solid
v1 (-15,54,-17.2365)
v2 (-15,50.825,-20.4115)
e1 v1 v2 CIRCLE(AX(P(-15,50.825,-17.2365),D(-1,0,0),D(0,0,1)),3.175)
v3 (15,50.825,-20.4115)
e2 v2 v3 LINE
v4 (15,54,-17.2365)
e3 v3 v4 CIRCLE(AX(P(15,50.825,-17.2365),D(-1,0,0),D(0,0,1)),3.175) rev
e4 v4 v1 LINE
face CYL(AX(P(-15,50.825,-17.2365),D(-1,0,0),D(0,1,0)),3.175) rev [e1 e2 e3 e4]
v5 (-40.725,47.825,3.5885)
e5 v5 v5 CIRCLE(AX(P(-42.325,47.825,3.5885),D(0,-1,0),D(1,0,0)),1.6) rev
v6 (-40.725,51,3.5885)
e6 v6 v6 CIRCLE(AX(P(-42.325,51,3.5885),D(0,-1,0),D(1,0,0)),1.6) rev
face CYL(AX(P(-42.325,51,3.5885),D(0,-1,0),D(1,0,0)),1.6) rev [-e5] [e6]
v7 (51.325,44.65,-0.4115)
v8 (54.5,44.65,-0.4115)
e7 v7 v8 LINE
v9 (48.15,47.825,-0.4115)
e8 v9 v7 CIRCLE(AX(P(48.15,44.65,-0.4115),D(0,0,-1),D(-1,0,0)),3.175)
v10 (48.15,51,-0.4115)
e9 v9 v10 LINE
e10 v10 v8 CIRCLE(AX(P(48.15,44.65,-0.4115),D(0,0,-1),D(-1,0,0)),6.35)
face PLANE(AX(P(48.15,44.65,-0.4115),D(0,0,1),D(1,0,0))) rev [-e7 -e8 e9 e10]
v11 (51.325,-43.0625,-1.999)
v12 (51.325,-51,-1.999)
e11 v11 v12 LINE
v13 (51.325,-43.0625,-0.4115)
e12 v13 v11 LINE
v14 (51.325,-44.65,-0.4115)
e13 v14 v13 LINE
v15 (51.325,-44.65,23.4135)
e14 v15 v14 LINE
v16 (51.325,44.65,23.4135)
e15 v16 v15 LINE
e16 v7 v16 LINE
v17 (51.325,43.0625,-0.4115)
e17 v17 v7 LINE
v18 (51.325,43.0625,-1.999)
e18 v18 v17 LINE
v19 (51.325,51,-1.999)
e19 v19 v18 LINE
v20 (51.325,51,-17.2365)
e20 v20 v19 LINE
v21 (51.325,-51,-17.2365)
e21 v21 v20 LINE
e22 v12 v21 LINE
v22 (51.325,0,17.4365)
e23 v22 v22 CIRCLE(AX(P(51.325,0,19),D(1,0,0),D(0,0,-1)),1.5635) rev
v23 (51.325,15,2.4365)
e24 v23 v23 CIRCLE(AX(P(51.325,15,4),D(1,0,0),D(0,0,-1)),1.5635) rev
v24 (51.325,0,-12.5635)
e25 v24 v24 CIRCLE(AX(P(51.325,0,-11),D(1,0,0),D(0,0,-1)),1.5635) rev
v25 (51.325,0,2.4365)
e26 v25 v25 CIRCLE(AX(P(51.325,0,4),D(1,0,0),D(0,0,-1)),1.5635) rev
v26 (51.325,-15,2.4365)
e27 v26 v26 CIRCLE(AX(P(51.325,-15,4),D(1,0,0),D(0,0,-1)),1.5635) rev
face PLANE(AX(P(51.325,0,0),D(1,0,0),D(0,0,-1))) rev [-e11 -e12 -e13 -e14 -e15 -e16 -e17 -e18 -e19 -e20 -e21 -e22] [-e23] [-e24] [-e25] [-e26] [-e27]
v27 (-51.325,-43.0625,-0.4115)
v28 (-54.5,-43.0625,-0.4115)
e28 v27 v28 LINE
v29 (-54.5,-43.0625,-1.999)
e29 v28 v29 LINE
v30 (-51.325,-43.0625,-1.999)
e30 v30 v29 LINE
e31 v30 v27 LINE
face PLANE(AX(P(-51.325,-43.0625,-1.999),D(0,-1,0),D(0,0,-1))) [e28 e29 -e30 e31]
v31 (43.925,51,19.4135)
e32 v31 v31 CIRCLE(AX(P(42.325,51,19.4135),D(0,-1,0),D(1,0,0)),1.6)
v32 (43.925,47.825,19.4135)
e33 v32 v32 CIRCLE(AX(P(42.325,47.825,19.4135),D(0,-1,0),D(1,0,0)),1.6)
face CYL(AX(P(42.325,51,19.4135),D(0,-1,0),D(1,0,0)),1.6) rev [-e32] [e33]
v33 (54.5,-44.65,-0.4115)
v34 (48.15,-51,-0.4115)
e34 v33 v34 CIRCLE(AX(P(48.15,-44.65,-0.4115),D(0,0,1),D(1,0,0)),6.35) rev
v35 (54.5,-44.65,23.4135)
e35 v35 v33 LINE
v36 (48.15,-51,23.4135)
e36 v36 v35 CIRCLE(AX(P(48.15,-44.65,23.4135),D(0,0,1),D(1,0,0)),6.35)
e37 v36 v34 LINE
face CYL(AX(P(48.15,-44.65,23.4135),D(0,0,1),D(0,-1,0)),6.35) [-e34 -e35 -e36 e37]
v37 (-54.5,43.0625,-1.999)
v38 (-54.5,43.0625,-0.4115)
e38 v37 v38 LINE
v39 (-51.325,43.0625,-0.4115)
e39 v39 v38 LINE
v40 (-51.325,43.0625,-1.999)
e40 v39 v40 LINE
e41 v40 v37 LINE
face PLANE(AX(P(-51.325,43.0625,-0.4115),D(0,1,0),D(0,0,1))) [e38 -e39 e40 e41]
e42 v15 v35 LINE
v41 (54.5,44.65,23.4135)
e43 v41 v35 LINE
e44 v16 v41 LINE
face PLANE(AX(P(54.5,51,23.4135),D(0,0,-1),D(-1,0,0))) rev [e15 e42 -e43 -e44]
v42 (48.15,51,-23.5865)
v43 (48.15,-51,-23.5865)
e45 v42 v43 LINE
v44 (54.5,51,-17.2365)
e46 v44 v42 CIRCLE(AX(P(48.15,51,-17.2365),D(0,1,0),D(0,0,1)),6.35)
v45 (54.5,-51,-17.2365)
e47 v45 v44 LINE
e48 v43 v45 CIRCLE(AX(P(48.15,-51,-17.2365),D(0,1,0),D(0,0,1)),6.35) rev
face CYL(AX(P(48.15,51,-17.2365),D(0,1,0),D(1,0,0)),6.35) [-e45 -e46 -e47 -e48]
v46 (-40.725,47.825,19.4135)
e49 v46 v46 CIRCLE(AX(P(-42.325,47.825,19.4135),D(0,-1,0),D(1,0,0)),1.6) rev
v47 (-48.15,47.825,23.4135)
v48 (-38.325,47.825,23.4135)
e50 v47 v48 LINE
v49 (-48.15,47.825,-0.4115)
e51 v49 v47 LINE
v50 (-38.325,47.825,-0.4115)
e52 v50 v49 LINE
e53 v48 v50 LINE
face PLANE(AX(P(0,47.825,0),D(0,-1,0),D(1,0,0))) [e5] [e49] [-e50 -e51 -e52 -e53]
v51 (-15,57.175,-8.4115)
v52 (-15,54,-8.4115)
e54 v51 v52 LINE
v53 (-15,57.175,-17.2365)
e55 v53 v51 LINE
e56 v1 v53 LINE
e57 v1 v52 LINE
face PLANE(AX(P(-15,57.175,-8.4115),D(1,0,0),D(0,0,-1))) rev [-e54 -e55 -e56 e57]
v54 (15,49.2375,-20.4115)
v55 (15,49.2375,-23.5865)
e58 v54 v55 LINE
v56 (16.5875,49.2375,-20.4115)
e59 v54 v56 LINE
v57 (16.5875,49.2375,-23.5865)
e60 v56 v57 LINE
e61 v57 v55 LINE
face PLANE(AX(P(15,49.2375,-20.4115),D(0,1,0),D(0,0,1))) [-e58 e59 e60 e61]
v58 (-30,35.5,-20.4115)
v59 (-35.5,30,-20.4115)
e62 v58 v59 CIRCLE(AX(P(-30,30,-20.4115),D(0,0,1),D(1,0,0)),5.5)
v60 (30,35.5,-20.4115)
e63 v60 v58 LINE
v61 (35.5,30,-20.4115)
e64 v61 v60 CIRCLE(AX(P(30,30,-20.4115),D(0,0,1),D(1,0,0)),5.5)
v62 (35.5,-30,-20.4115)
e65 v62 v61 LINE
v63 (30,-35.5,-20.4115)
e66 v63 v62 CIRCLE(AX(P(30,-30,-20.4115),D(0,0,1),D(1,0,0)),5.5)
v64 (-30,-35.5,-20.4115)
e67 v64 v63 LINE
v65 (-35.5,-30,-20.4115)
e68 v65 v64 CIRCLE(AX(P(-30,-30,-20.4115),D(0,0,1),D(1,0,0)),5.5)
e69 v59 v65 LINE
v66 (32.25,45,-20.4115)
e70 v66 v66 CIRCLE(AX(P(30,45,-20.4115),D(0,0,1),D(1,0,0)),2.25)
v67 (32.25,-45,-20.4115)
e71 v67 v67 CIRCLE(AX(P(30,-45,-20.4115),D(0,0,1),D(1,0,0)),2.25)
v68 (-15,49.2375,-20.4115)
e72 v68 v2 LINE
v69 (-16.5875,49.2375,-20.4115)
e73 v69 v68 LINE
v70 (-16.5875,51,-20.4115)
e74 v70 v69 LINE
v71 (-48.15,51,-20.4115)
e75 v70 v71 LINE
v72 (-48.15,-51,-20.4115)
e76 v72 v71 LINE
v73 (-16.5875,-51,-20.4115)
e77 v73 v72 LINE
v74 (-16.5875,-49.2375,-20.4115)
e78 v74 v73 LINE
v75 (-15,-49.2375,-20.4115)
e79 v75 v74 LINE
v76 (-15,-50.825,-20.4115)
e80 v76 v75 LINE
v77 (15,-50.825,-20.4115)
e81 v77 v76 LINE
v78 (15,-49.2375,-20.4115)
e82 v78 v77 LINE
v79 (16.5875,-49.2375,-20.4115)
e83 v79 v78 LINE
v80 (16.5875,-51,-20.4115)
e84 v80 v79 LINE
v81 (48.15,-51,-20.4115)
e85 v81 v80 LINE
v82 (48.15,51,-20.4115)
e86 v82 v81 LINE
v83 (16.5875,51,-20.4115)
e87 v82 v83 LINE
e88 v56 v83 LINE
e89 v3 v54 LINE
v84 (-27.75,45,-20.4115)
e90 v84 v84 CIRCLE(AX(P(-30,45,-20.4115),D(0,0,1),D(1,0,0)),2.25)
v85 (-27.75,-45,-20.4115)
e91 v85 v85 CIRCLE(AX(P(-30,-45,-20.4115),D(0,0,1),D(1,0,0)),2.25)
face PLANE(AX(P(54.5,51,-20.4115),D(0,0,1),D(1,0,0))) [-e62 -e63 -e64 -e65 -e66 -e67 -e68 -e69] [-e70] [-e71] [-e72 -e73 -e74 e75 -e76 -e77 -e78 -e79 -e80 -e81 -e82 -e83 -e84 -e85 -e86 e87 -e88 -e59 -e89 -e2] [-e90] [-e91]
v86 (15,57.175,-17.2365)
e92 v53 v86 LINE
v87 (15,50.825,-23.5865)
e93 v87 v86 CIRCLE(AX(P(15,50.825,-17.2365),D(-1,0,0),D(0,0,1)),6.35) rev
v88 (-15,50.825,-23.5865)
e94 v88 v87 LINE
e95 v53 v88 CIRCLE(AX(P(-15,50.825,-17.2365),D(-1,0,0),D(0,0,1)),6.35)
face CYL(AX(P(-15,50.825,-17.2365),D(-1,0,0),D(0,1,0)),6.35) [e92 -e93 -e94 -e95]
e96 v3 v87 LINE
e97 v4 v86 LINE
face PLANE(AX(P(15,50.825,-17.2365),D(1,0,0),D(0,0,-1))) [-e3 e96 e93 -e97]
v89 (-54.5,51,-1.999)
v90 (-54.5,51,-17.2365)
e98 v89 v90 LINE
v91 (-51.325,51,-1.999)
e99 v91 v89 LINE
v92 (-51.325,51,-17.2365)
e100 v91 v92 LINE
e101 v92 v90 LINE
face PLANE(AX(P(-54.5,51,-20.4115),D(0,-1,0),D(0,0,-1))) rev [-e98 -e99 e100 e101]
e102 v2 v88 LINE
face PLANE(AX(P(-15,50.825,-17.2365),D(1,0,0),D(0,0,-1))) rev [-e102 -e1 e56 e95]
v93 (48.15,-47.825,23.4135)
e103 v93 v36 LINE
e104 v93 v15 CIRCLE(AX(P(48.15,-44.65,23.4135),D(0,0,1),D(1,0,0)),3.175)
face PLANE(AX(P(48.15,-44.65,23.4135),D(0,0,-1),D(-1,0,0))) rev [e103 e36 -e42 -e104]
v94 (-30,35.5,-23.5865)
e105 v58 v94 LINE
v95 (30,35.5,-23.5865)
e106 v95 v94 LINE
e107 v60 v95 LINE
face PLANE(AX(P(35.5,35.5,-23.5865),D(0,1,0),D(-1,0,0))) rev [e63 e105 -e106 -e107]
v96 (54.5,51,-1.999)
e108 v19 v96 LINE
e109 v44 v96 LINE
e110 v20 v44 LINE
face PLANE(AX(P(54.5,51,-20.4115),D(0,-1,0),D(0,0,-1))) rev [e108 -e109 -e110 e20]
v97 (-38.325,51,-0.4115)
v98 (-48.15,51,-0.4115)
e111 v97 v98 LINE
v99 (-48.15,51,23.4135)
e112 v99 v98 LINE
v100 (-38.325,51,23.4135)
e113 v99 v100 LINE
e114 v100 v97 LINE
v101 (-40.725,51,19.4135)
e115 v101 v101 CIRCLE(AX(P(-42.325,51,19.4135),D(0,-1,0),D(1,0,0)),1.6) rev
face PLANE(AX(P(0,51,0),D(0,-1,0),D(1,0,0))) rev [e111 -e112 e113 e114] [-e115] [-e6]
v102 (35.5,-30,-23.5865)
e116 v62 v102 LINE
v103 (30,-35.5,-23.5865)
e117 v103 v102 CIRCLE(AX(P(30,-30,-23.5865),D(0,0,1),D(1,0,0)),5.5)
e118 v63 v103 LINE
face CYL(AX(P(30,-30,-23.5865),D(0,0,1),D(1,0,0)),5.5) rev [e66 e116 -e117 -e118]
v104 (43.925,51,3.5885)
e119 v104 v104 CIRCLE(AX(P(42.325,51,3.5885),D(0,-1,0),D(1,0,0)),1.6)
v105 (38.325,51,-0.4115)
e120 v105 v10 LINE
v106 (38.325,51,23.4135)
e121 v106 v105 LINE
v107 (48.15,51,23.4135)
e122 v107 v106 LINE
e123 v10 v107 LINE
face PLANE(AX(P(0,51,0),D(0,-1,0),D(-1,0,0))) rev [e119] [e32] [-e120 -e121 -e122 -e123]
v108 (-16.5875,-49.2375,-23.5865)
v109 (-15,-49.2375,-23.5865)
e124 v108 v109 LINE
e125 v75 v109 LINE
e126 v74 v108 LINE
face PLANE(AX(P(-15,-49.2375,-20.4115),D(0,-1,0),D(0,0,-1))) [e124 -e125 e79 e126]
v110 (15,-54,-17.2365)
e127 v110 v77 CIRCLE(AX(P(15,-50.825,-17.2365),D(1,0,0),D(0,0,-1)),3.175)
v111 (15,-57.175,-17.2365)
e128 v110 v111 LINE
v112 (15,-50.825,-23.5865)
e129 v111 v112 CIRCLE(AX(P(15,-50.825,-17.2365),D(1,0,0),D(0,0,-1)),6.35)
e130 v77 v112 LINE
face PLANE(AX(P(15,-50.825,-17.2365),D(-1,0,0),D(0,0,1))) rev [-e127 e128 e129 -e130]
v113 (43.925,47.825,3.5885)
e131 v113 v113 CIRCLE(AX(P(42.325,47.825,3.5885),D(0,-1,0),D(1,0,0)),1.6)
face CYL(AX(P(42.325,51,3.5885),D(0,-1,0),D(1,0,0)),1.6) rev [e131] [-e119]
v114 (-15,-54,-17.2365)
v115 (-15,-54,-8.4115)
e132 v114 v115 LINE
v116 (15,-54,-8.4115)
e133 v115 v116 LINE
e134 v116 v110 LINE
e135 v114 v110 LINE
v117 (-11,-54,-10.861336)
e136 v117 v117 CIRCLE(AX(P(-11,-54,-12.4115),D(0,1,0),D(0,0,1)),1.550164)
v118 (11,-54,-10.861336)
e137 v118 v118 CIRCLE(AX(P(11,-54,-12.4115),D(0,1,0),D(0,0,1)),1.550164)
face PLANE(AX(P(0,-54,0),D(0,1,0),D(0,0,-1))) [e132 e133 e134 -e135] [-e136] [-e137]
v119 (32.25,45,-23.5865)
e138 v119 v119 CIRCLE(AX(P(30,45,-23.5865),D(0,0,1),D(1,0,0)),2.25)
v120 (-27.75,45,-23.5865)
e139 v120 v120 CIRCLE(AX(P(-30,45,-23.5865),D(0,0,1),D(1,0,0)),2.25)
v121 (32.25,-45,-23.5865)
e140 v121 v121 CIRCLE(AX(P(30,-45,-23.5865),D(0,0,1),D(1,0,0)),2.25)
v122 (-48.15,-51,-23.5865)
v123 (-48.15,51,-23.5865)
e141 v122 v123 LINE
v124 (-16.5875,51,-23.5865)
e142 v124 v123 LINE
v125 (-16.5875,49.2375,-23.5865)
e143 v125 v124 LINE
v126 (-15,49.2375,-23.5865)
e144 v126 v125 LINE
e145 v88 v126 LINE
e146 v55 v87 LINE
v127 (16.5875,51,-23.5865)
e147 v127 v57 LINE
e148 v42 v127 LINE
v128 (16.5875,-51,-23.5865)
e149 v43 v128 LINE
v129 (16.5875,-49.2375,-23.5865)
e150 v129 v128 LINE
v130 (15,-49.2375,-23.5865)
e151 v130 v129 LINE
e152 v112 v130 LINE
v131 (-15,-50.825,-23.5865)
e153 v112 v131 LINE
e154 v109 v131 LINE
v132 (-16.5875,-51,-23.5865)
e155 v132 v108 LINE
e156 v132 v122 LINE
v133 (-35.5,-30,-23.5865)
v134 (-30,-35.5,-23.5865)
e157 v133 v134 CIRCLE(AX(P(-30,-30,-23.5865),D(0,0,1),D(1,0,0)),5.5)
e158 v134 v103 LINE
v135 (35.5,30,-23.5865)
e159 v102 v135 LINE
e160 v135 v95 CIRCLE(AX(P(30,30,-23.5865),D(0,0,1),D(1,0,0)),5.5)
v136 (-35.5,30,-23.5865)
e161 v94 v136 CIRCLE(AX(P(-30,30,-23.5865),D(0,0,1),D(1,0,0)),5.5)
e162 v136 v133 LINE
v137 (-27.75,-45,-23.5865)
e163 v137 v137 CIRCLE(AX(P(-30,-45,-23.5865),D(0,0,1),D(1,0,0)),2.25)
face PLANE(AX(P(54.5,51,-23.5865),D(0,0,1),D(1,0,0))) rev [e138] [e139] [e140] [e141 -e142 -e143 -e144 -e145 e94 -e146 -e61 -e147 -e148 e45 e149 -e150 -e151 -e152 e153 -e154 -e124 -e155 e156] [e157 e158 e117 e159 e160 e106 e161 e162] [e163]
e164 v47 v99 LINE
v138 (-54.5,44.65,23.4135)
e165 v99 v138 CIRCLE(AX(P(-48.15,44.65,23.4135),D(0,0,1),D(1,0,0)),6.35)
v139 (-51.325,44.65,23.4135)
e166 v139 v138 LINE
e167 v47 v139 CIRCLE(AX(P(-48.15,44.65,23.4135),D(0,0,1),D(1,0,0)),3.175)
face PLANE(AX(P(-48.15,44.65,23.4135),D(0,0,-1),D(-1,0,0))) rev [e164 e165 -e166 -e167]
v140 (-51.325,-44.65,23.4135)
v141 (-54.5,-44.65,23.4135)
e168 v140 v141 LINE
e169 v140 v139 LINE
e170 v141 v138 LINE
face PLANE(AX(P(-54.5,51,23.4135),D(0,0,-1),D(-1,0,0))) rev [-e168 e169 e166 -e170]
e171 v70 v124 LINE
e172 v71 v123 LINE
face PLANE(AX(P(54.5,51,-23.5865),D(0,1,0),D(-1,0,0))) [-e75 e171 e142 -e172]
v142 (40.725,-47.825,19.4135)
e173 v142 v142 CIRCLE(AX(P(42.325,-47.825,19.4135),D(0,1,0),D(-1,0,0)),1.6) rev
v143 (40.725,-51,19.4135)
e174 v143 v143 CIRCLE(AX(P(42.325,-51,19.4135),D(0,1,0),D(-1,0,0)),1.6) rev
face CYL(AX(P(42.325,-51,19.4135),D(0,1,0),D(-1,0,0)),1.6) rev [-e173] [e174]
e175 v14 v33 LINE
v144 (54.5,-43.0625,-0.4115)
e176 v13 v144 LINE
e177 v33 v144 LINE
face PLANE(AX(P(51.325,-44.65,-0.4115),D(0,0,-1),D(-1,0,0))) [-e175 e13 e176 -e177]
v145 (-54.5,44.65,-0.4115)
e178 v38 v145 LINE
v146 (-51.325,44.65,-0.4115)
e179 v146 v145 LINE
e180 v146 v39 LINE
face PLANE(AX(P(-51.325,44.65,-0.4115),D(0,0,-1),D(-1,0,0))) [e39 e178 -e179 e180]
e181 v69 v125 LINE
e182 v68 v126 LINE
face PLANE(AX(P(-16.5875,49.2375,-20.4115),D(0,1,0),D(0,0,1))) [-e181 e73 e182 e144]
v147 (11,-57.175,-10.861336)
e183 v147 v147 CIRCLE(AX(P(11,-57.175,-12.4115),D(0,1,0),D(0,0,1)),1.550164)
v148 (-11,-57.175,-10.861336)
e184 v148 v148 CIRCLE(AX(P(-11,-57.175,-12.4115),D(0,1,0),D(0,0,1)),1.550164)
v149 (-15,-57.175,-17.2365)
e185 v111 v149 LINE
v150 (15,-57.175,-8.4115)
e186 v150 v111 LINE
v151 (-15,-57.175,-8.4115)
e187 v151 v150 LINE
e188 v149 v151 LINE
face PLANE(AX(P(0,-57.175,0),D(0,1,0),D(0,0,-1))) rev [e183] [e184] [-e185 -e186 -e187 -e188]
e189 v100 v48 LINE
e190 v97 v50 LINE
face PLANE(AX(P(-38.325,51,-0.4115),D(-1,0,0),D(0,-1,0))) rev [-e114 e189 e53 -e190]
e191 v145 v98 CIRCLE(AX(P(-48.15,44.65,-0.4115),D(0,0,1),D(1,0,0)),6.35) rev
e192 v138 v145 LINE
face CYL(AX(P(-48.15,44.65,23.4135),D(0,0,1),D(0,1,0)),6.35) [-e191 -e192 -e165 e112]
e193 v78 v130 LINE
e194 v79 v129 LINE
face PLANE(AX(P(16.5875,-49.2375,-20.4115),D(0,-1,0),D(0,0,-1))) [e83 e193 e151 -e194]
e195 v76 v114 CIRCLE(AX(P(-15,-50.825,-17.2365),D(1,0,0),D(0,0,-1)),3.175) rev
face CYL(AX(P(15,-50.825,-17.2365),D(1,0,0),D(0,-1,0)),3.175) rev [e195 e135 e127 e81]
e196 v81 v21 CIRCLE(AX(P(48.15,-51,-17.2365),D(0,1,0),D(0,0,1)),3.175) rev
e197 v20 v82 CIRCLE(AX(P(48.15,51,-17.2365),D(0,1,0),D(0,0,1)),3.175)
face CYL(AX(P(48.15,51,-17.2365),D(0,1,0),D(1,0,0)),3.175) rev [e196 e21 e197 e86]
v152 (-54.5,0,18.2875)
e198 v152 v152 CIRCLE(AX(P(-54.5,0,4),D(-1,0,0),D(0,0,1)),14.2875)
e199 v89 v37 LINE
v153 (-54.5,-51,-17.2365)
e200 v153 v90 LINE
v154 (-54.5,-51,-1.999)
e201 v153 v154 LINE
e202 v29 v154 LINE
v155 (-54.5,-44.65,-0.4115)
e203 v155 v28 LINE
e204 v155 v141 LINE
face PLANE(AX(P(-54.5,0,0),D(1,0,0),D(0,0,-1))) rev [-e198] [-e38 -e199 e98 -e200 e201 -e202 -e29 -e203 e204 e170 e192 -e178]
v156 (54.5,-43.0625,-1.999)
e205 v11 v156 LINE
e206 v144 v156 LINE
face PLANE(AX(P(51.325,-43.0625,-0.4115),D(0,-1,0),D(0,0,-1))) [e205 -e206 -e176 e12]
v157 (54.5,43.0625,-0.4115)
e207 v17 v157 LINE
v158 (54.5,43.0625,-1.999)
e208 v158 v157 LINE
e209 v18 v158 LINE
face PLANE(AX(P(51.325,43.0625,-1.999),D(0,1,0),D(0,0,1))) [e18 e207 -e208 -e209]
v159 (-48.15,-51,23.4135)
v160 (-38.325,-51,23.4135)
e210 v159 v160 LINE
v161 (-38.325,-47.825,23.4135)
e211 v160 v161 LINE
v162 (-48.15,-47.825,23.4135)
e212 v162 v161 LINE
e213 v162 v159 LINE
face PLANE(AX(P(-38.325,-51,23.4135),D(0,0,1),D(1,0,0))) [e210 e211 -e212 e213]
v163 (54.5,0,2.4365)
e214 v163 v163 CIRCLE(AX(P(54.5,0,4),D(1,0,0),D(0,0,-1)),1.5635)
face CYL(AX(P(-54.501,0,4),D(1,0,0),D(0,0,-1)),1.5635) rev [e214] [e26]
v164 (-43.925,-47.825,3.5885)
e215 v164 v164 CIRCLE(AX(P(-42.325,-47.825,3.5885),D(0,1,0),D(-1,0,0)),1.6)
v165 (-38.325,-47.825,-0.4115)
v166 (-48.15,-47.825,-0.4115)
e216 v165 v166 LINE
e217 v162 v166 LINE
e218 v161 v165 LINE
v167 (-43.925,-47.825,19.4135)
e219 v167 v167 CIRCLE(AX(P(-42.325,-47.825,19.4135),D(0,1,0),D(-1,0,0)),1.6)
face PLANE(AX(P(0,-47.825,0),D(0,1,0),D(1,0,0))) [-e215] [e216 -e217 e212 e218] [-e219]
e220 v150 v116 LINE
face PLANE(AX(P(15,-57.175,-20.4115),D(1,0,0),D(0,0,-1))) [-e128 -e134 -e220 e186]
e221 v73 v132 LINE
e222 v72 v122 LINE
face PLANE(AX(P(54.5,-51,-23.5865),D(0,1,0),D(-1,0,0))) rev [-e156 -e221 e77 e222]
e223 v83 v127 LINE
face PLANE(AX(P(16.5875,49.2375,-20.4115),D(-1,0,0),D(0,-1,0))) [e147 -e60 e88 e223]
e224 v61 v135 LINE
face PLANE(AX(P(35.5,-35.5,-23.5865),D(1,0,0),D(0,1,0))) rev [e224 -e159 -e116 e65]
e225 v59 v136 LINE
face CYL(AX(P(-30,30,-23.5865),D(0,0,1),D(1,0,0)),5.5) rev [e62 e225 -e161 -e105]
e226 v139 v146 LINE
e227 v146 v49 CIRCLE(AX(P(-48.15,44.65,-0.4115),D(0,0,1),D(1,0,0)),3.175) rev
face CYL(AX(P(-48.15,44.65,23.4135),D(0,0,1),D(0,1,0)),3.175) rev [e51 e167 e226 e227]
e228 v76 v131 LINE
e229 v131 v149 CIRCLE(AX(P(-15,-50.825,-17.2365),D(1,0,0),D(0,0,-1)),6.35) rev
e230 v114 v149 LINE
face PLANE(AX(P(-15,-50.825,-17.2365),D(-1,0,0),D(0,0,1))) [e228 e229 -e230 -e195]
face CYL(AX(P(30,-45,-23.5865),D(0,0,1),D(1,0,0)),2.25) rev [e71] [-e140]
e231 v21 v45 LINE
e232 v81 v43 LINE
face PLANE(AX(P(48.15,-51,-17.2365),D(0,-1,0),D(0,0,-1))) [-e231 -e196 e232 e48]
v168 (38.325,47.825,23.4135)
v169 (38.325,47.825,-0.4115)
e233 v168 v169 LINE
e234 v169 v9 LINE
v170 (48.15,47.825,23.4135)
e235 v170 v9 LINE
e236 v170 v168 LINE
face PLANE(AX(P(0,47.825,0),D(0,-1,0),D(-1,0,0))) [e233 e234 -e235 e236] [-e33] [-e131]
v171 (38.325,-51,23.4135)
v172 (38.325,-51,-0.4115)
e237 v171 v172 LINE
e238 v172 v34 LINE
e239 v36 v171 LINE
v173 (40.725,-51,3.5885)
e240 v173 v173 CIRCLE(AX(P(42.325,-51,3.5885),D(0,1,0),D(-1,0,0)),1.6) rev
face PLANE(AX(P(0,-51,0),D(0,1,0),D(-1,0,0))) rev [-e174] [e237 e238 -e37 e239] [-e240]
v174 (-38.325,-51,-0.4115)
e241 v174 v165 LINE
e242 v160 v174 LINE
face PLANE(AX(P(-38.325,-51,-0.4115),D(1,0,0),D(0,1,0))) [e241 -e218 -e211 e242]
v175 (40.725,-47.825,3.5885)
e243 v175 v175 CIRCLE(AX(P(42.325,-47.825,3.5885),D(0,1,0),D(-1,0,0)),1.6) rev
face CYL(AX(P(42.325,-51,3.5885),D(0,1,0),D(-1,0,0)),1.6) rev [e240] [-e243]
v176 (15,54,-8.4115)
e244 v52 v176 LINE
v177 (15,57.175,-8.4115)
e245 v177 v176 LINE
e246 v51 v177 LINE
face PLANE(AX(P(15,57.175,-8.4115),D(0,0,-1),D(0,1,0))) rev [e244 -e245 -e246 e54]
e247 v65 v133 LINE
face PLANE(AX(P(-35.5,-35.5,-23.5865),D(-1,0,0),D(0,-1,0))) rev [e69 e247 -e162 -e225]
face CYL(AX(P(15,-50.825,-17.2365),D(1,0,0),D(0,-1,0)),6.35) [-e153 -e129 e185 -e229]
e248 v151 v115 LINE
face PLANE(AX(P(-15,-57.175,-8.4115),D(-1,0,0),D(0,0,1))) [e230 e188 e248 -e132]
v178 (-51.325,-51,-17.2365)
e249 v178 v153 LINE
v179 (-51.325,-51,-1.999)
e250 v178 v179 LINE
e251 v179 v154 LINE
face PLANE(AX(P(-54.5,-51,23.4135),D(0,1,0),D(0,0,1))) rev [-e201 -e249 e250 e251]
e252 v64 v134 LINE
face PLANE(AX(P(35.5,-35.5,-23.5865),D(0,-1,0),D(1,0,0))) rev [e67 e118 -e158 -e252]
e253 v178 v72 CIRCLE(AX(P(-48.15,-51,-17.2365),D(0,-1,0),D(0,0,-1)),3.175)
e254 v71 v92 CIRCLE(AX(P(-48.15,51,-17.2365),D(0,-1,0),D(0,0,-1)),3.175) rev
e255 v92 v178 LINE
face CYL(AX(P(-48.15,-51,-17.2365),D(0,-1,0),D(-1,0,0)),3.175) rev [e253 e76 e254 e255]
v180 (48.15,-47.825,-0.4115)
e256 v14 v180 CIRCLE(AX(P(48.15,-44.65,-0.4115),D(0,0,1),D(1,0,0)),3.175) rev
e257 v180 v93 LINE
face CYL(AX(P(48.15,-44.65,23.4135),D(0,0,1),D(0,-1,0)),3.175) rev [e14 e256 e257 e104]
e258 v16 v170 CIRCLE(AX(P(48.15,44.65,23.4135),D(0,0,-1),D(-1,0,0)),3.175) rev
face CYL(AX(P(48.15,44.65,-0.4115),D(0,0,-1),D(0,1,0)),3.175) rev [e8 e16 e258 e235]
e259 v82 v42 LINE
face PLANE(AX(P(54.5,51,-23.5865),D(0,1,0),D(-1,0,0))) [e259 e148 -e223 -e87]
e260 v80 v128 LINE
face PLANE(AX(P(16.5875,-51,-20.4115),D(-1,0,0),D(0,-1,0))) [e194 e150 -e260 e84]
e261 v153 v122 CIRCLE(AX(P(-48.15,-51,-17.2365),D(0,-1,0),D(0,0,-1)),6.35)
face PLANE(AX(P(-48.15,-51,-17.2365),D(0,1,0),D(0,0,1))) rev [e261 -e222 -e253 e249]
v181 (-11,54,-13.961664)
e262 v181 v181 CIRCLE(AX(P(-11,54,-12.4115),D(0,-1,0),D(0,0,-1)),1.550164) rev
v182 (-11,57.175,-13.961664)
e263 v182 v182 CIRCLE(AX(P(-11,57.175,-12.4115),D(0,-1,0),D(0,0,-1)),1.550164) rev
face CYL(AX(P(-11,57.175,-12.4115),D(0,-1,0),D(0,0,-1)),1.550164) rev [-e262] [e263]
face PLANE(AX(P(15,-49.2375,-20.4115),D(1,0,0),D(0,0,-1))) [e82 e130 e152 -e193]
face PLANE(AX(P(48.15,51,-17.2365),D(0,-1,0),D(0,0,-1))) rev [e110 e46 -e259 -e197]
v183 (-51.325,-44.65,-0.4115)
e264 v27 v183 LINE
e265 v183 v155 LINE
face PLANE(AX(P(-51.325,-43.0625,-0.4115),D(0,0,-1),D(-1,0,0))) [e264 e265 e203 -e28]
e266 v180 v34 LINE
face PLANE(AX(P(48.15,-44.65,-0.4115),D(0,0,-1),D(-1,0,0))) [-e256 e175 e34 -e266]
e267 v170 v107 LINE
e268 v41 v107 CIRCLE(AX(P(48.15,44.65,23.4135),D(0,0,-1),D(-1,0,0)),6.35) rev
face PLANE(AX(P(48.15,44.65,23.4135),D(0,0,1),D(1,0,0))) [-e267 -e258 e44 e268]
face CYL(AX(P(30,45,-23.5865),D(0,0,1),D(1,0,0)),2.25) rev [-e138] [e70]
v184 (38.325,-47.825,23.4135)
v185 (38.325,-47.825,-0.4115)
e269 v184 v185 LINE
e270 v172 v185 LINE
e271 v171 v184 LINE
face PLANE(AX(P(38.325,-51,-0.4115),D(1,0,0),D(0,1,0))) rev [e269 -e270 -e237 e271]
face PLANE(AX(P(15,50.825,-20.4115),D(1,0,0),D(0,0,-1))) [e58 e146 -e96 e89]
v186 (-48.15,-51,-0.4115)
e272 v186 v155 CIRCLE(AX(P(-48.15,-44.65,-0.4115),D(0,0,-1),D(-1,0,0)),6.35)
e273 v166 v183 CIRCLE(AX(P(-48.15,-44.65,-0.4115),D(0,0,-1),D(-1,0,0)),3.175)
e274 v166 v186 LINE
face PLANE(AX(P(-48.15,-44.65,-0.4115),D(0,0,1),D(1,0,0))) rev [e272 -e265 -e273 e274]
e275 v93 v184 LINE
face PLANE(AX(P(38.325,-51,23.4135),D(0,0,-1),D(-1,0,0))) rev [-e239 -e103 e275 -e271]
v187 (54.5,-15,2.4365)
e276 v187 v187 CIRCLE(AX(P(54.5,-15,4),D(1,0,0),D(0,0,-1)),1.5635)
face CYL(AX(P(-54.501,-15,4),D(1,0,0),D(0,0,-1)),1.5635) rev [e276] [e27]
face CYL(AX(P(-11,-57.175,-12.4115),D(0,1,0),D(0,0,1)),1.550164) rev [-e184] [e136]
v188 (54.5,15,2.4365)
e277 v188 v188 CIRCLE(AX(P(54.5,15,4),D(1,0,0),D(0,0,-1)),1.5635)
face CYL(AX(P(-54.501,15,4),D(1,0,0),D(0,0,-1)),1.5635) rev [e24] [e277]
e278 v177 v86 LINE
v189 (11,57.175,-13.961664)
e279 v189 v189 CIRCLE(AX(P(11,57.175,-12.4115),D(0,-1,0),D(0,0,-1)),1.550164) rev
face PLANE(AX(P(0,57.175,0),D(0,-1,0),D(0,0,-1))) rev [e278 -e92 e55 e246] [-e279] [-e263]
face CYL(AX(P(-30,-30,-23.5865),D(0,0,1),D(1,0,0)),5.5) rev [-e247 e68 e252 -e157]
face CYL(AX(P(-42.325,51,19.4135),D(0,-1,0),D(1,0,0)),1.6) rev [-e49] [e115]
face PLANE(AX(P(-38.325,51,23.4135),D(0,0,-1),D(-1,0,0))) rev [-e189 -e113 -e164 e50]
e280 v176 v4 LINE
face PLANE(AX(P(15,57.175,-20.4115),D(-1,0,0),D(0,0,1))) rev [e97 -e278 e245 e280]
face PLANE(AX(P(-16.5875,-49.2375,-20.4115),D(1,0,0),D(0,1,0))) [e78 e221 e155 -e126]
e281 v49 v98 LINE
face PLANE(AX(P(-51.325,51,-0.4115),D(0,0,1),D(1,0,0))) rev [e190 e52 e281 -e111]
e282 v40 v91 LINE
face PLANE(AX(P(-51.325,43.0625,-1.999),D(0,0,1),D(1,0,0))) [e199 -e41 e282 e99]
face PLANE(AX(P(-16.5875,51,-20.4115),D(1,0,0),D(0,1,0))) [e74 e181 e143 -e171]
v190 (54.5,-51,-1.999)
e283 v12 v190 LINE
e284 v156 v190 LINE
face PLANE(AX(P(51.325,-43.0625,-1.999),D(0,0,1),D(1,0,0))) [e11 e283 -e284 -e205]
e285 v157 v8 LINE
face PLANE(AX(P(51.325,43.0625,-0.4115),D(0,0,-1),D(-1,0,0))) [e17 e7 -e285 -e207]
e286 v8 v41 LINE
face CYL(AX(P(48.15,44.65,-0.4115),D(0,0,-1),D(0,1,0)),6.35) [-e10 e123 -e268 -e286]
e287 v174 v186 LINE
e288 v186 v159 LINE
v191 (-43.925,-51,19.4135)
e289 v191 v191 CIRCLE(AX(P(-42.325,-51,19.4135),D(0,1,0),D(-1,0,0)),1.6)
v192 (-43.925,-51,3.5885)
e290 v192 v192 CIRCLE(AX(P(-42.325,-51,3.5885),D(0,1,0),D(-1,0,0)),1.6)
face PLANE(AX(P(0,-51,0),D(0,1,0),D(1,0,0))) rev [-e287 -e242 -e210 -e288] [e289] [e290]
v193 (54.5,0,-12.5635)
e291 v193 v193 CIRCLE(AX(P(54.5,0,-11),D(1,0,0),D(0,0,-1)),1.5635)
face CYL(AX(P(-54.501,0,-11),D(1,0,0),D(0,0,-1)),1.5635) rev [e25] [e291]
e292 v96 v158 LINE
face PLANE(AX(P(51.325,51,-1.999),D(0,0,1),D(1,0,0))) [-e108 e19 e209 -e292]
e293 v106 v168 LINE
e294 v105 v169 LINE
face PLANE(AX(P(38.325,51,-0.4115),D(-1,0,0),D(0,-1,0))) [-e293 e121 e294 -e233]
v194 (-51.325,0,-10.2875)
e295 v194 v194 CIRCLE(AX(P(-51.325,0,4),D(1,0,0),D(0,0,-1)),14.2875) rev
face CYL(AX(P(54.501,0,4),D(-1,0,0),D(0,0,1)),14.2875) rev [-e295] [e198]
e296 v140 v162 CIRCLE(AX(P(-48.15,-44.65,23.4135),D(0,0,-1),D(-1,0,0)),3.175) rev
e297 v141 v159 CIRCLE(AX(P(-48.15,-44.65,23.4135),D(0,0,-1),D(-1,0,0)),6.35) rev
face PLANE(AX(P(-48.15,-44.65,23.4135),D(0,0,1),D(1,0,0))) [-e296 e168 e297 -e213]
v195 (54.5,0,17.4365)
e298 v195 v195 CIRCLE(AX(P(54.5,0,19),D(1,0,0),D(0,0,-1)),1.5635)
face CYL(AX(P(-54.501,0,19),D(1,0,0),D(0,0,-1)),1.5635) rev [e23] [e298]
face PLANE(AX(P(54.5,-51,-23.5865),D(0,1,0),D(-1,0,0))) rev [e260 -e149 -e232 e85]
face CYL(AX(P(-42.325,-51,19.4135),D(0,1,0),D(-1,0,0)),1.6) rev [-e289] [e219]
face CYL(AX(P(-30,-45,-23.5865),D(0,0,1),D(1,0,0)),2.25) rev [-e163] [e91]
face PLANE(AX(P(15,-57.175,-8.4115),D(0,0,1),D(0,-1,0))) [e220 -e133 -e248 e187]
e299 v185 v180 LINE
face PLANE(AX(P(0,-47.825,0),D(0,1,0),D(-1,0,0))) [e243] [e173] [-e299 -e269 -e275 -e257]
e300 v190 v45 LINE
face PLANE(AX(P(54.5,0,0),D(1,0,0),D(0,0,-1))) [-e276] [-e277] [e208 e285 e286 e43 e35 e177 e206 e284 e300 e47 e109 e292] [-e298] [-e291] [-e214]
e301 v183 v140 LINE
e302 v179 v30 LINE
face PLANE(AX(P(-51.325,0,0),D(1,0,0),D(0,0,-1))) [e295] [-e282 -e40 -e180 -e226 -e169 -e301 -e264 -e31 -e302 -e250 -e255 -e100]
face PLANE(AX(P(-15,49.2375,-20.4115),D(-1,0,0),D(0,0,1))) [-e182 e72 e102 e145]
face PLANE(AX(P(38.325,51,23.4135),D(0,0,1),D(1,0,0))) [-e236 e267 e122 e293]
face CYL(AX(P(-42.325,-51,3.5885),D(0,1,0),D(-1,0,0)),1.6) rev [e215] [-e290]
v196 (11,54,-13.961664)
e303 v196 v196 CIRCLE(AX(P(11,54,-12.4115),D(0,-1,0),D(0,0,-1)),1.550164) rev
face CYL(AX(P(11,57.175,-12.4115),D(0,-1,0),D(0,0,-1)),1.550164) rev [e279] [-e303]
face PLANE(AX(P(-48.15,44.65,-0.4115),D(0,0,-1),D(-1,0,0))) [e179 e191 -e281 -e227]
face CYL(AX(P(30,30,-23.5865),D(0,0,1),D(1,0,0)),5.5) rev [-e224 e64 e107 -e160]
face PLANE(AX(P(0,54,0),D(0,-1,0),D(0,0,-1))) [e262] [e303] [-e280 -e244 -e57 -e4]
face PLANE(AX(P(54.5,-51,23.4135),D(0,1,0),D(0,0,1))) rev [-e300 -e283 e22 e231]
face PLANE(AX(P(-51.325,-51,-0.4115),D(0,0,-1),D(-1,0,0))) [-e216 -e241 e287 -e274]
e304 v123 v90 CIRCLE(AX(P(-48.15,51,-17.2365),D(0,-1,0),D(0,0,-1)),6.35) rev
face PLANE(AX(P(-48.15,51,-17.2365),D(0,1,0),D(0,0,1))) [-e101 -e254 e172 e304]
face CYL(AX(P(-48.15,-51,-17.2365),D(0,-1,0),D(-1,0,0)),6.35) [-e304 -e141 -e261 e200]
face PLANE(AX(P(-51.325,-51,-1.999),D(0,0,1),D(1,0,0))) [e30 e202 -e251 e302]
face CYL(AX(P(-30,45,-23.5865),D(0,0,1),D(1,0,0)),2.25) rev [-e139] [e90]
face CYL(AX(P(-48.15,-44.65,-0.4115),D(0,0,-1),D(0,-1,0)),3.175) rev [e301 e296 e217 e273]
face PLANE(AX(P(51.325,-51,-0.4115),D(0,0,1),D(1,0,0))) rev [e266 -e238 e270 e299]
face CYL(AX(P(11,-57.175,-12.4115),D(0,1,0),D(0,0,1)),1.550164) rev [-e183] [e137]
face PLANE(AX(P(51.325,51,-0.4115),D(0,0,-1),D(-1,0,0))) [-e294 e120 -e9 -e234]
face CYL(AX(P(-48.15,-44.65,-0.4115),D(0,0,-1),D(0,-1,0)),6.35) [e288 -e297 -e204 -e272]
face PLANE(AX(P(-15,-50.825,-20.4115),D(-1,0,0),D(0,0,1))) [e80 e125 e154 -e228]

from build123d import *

# Parameters (mm, degrees)
BOSS_EXTRUDE2_DEPTH            = 51
BOSS_EXTRUDE2_DEPTH_BACK       = 51
SKETCH4_R                      = 2.25
SKETCH4_W                      = 71
SKETCH4_H                      = 71
CUT_EXTRUDE1_DEPTH             = 89.519630491
SKETCH5_R                      = 14.2875
CUT_EXTRUDE2_DEPTH             = 125.024191189
FILLET1_R                      = 5.5
CONVERT_SOLID1_START           = -20.4115
CONVERT_SOLID1_OUTLINE_W       = 109
CONVERT_SOLID1_OUTLINE_H       = 102
CONVERT_SOLID1_OUTLINE_R       = 2.25
CONVERT_SOLID1_DEPTH           = 50.4115
EDGE_FLANGE6_STRIP_W           = 19.05
EDGE_FLANGE6_STRIP_H           = 3.175
EDGE_FLANGE6_STRIP_CUT_DEPTH   = 102
EDGE_FLANGE6_STRIP_2_W         = 19.05
EDGE_FLANGE6_STRIP_2_H         = 3.175
EDGE_FLANGE6_STRIP_CUT_2_DEPTH = 102
EDGE_FLANGE6_DEPTH             = 102
EDGE_FLANGE6_BEND_DEPTH        = 102
EDGE_FLANGE8_STRIP_W           = 19.05
EDGE_FLANGE8_STRIP_H           = 3.175
EDGE_FLANGE8_STRIP_CUT_DEPTH   = 23.825
EDGE_FLANGE8_RELIEF_W          = 20.6375
EDGE_FLANGE8_RELIEF_H          = 1.5875
EDGE_FLANGE8_RELIEF_CUT_DEPTH  = 3.175
EDGE_FLANGE8_DEPTH             = 23.825
EDGE_FLANGE8_PROFILE_W         = 23.825
EDGE_FLANGE8_PROFILE_H         = 9.825
EDGE_FLANGE8_PROFILE_R         = 1.6
EDGE_FLANGE8_FLAT_DEPTH        = 3.175
MIRROR2_COPY_1_SKETCH_W        = 19.05
MIRROR2_COPY_1_SKETCH_H        = 3.175
MIRROR2_COPY_1_DEPTH           = 23.825
MIRROR2_COPY_2_SKETCH_W        = 20.6375
MIRROR2_COPY_2_SKETCH_H        = 1.5875
MIRROR2_COPY_2_DEPTH           = 3.175
MIRROR2_COPY_3_DEPTH           = 23.825
MIRROR2_COPY_4_SKETCH_W        = 23.825
MIRROR2_COPY_4_SKETCH_H        = 9.825
MIRROR2_COPY_4_SKETCH_R        = 1.6
MIRROR2_COPY_4_DEPTH           = 3.175
EDGE_FLANGE10_STRIP_W          = 22.05
EDGE_FLANGE10_STRIP_H          = 3.175
EDGE_FLANGE10_STRIP_CUT_DEPTH  = 30
EDGE_FLANGE10_RELIEF_W         = 23.6375
EDGE_FLANGE10_RELIEF_H         = 1.5875
EDGE_FLANGE10_RELIEF_CUT_DEPTH = 3.175
EDGE_FLANGE10_DEPTH            = 30
EDGE_FLANGE10_START            = 3.175
EDGE_FLANGE10_PROFILE_W        = 30
EDGE_FLANGE10_PROFILE_H        = 8.825
EDGE_FLANGE10_PROFILE_R        = 1.550163604
EDGE_FLANGE10_FLAT_DEPTH       = 3.175
CUT_EXTRUDE3_REACH             = 127.325
SKETCH31_R                     = 1.5635
CUT_EXTRUDE4_REACH             = 127.325
SKETCH57_R                     = 14.2875


# Read off the part's stored shape, not the designer's step: Convert-Solid1
# Sheet-metal steps are written as plain solids
with BuildPart() as part:
    # Sketch3 → Boss-Extrude2 (new, two sides: drawn at the far end of the back side and taken through both)
    with BuildSketch(Plane(origin=(0, 0, 0), x_dir=(1, 0, 0), z_dir=(0, 1, 0)).offset(-BOSS_EXTRUDE2_DEPTH_BACK)):
        Polygon((-48.5, -30), (-54.5, -30), (-54.5, 23.5865), (54.5, 23.5865), (54.5, -30), (48.5, -30), (48.5, 17.5865), (-48.5, 17.5865), align=None)
    extrude(amount=BOSS_EXTRUDE2_DEPTH + BOSS_EXTRUDE2_DEPTH_BACK)

    # Sketch4 → Cut-Extrude1 (cut, through all)
    with BuildSketch(Plane.XY.offset(-17.5865)):
        with Locations((-30, 45)):
            Circle(SKETCH4_R)
        with Locations((30, 45)):
            Circle(SKETCH4_R)
        with Locations((30, -45)):
            Circle(SKETCH4_R)
        with Locations((-30, -45)):
            Circle(SKETCH4_R)
        Rectangle(SKETCH4_W, SKETCH4_H)
    extrude(amount=-CUT_EXTRUDE1_DEPTH, mode=Mode.SUBTRACT)

    # Sketch5 → Cut-Extrude2 (cut, through all)
    with BuildSketch(Plane(origin=(54.5, 0, 0), x_dir=(0, 0, -1), z_dir=(1, 0, 0))):
        Circle(SKETCH5_R)
    extrude(amount=-CUT_EXTRUDE2_DEPTH, mode=Mode.SUBTRACT)

    # Fillet1
    fillet1_edges = [part.edges().sort_by_distance(p)[0] for p in [
        (-35.5, -35.5, -20.5865),
        (-35.5, 35.5, -20.5865),
        (35.5, 35.5, -20.5865),
        (35.5, -35.5, -20.5865),
    ]]
    fillet(fillet1_edges, radius=FILLET1_R)

    # Convert-Solid1 outline → Convert-Solid1 (cut)
    with BuildSketch(Plane.XY.offset(CONVERT_SOLID1_START)):
        Rectangle(CONVERT_SOLID1_OUTLINE_W, CONVERT_SOLID1_OUTLINE_H)
        with Locations((-30, -45)):
            Circle(CONVERT_SOLID1_OUTLINE_R, mode=Mode.SUBTRACT)
        with Locations((30, -45)):
            Circle(CONVERT_SOLID1_OUTLINE_R, mode=Mode.SUBTRACT)
        with Locations((-30, 45)):
            Circle(CONVERT_SOLID1_OUTLINE_R, mode=Mode.SUBTRACT)
        with BuildLine():
            Line((-35.5, -30), (-35.5, 30))
            ThreePointArc((-35.5, 30), (-33.889087297, 33.889087297), (-30, 35.5))
            Line((-30, 35.5), (30, 35.5))
            ThreePointArc((30, 35.5), (33.889087297, 33.889087297), (35.5, 30))
            Line((35.5, 30), (35.5, -30))
            ThreePointArc((35.5, -30), (33.889087297, -33.889087297), (30, -35.5))
            Line((30, -35.5), (-30, -35.5))
            ThreePointArc((-30, -35.5), (-33.889087297, -33.889087297), (-35.5, -30))
        make_face(mode=Mode.SUBTRACT)
        with Locations((30, 45)):
            Circle(CONVERT_SOLID1_OUTLINE_R, mode=Mode.SUBTRACT)
    extrude(amount=CONVERT_SOLID1_DEPTH, mode=Mode.SUBTRACT)

    # Edge-Flange6 strip (across the edge) → Edge-Flange6 strip cut (cut)
    with BuildSketch(Plane(origin=(-54.5, 51, -20.4115), x_dir=(1, 0, 0), z_dir=(0, -1, 0))):
        with Locations((-3.175, -1.5875)):
            Rectangle(EDGE_FLANGE6_STRIP_W, EDGE_FLANGE6_STRIP_H)
    extrude(amount=EDGE_FLANGE6_STRIP_CUT_DEPTH, mode=Mode.SUBTRACT)

    # Edge-Flange6 strip 2 (across the edge) → Edge-Flange6 strip cut 2 (cut)
    with BuildSketch(Plane(origin=(54.5, -51, -20.4115), x_dir=(-1, 0, 0), z_dir=(0, 1, 0))):
        with Locations((-3.175, -1.5875)):
            Rectangle(EDGE_FLANGE6_STRIP_2_W, EDGE_FLANGE6_STRIP_2_H)
    extrude(amount=EDGE_FLANGE6_STRIP_CUT_2_DEPTH, mode=Mode.SUBTRACT)

    # Edge-Flange6 section (across the edge) → Edge-Flange6 (add)
    with BuildSketch(Plane(origin=(-54.5, 51, -20.4115), x_dir=(1, 0, 0), z_dir=(0, -1, 0))):
        with BuildLine():
            Line((0, 3.175), (0, 43.825))
            Line((0, 43.825), (3.175, 43.825))
            Line((3.175, 43.825), (3.175, 3.175))
            ThreePointArc((3.175, 3.175), (4.10493597, 0.92993597), (6.35, 0))
            Line((6.35, 0), (6.35, -3.175))
            ThreePointArc((6.35, -3.175), (1.859871939, -1.315128061), (0, 3.175))
        make_face()
    extrude(amount=EDGE_FLANGE6_DEPTH)

    # Edge-Flange6 section 2 (across the edge) → Edge-Flange6 bend (add)
    with BuildSketch(Plane(origin=(54.5, -51, -20.4115), x_dir=(-1, 0, 0), z_dir=(0, 1, 0))):
        with BuildLine():
            Line((0, 3.175), (0, 43.825))
            Line((0, 43.825), (3.175, 43.825))
            Line((3.175, 43.825), (3.175, 3.175))
            ThreePointArc((3.175, 3.175), (4.10493597, 0.92993597), (6.35, 0))
            Line((6.35, 0), (6.35, -3.175))
            ThreePointArc((6.35, -3.175), (1.859871939, -1.315128061), (0, 3.175))
        make_face()
    extrude(amount=EDGE_FLANGE6_BEND_DEPTH)

    # Edge-Flange8 strip (across the edge) → Edge-Flange8 strip cut (cut)
    with BuildSketch(Plane(origin=(-51.325, 51, -0.4115), x_dir=(0, -1, 0), z_dir=(0, 0, 1))):
        with Locations((-3.175, -1.5875)):
            Rectangle(EDGE_FLANGE8_STRIP_W, EDGE_FLANGE8_STRIP_H)
    edge_flange8_strip_cut = extrude(amount=EDGE_FLANGE8_STRIP_CUT_DEPTH, mode=Mode.SUBTRACT)

    # Edge-Flange8 relief (on the sheet) → Edge-Flange8 relief cut (cut)
    with BuildSketch(Plane(origin=(-51.325, 44.65, -0.4115), x_dir=(0, -1, 0), z_dir=(1, 0, 0))):
        with Locations((-8.73125, 0.79375)):
            Rectangle(EDGE_FLANGE8_RELIEF_W, EDGE_FLANGE8_RELIEF_H)
    edge_flange8_relief_cut = extrude(amount=-EDGE_FLANGE8_RELIEF_CUT_DEPTH, mode=Mode.SUBTRACT)

    # Edge-Flange8 bend section (across the edge) → Edge-Flange8 (add)
    with BuildSketch(Plane(origin=(-51.325, 51, -0.4115), x_dir=(0, -1, 0), z_dir=(0, 0, 1))):
        with BuildLine():
            Line((0, 3.175), (3.175, 3.175))
            ThreePointArc((3.175, 3.175), (4.10493597, 0.92993597), (6.35, 0))
            Line((6.35, 0), (6.35, -3.175))
            ThreePointArc((6.35, -3.175), (1.859871939, -1.315128061), (0, 3.175))
        make_face()
    edge_flange8 = extrude(amount=EDGE_FLANGE8_DEPTH)

    # Edge-Flange8 profile (on flange) → Edge-Flange8 flat (add)
    with BuildSketch(Plane(origin=(-51.325, 51, 0), x_dir=(0, 0, 1), z_dir=(0, 1, 0))):
        with Locations((11.501, 8.0875)):
            Rectangle(EDGE_FLANGE8_PROFILE_W, EDGE_FLANGE8_PROFILE_H)
        with Locations((19.4135, 9)):
            Circle(EDGE_FLANGE8_PROFILE_R, mode=Mode.SUBTRACT)
        with Locations((3.5885, 9)):
            Circle(EDGE_FLANGE8_PROFILE_R, mode=Mode.SUBTRACT)
    edge_flange8_flat = extrude(amount=-EDGE_FLANGE8_FLAT_DEPTH)

    # Mirror1: Edge-Flange8 strip cut, Edge-Flange8 relief cut, Edge-Flange8, Edge-Flange8 flat across plane
    add(edge_flange8_strip_cut.mirror(Plane(origin=(0, 0, 0), x_dir=(0, 0, 1), z_dir=(1, 0, 0))), mode=Mode.SUBTRACT)
    add(edge_flange8_relief_cut.mirror(Plane(origin=(0, 0, 0), x_dir=(0, 0, 1), z_dir=(1, 0, 0))), mode=Mode.SUBTRACT)
    add(edge_flange8.mirror(Plane(origin=(0, 0, 0), x_dir=(0, 0, 1), z_dir=(1, 0, 0))))
    add(edge_flange8_flat.mirror(Plane(origin=(0, 0, 0), x_dir=(0, 0, 1), z_dir=(1, 0, 0))))

    # Mirror2: Edge-Flange8 strip cut, Edge-Flange8 relief cut, Edge-Flange8, Edge-Flange8 flat across plane
    add(edge_flange8_strip_cut.mirror(Plane.ZX), mode=Mode.SUBTRACT)
    add(edge_flange8_relief_cut.mirror(Plane.ZX), mode=Mode.SUBTRACT)
    add(edge_flange8.mirror(Plane.ZX))
    add(edge_flange8_flat.mirror(Plane.ZX))

    # Mirror2 copy 1 sketch → Mirror2 copy 1 (cut)
    with BuildSketch(Plane(origin=(51.325, -51, -0.4115), x_dir=(0, 1, 0), z_dir=(0, 0, 1))):
        with Locations((-3.175, -1.5875)):
            Rectangle(MIRROR2_COPY_1_SKETCH_W, MIRROR2_COPY_1_SKETCH_H)
    extrude(amount=MIRROR2_COPY_1_DEPTH, mode=Mode.SUBTRACT)

    # Mirror2 copy 2 sketch → Mirror2 copy 2 (cut)
    with BuildSketch(Plane(origin=(51.325, -44.65, -0.4115), x_dir=(0, 1, 0), z_dir=(-1, 0, 0))):
        with Locations((-8.73125, 0.79375)):
            Rectangle(MIRROR2_COPY_2_SKETCH_W, MIRROR2_COPY_2_SKETCH_H)
    extrude(amount=-MIRROR2_COPY_2_DEPTH, mode=Mode.SUBTRACT)

    # Mirror2 copy 3 sketch → Mirror2 copy 3 (add)
    with BuildSketch(Plane(origin=(51.325, -51, -0.4115), x_dir=(0, 1, 0), z_dir=(0, 0, 1))):
        with BuildLine():
            Line((0, 3.175), (3.175, 3.175))
            ThreePointArc((3.175, 3.175), (4.10493597, 0.92993597), (6.35, 0))
            Line((6.35, 0), (6.35, -3.175))
            ThreePointArc((6.35, -3.175), (1.859871939, -1.315128061), (0, 3.175))
        make_face()
    extrude(amount=MIRROR2_COPY_3_DEPTH)

    # Mirror2 copy 4 sketch → Mirror2 copy 4 (add)
    with BuildSketch(Plane(origin=(51.325, -51, 0), x_dir=(0, 0, 1), z_dir=(0, -1, 0))):
        with Locations((11.501, 8.0875)):
            Rectangle(MIRROR2_COPY_4_SKETCH_W, MIRROR2_COPY_4_SKETCH_H)
        with Locations((19.4135, 9)):
            Circle(MIRROR2_COPY_4_SKETCH_R, mode=Mode.SUBTRACT)
        with Locations((3.5885, 9)):
            Circle(MIRROR2_COPY_4_SKETCH_R, mode=Mode.SUBTRACT)
    extrude(amount=-MIRROR2_COPY_4_DEPTH)

    # Edge-Flange10 strip (across the edge) → Edge-Flange10 strip cut (cut)
    with BuildSketch(Plane(origin=(15, 54, -20.4115), x_dir=(0, -1, 0), z_dir=(-1, 0, 0))):
        with Locations((-7.85, -1.5875)):
            Rectangle(EDGE_FLANGE10_STRIP_W, EDGE_FLANGE10_STRIP_H)
    edge_flange10_strip_cut = extrude(amount=EDGE_FLANGE10_STRIP_CUT_DEPTH, mode=Mode.SUBTRACT)

    # Edge-Flange10 relief (on the sheet) → Edge-Flange10 relief cut (cut)
    with BuildSketch(Plane(origin=(15, 50.825, -20.4115), x_dir=(0, -1, 0), z_dir=(0, 0, 1))):
        with Locations((-10.23125, 0.79375)):
            Rectangle(EDGE_FLANGE10_RELIEF_W, EDGE_FLANGE10_RELIEF_H)
        with Locations((-10.23125, -30.79375)):
            Rectangle(EDGE_FLANGE10_RELIEF_W, EDGE_FLANGE10_RELIEF_H)
    edge_flange10_relief_cut = extrude(amount=-EDGE_FLANGE10_RELIEF_CUT_DEPTH, mode=Mode.SUBTRACT)

    # Edge-Flange10 bend section (across the edge) → Edge-Flange10 (add)
    with BuildSketch(Plane(origin=(15, 54, -20.4115), x_dir=(0, -1, 0), z_dir=(-1, 0, 0))):
        with BuildLine():
            Line((-3.175, 3.175), (0, 3.175))
            ThreePointArc((0, 3.175), (0.92993597, 0.92993597), (3.175, 0))
            Line((3.175, 0), (3.175, -3.175))
            ThreePointArc((3.175, -3.175), (-1.315128061, -1.315128061), (-3.175, 3.175))
        make_face()
    edge_flange10 = extrude(amount=EDGE_FLANGE10_DEPTH)

    # Edge-Flange10 profile (on flange) → Edge-Flange10 flat (add)
    with BuildSketch(Plane(origin=(0, 54, -20.4115), x_dir=(-1, 0, 0), z_dir=(0, 1, 0)).offset(EDGE_FLANGE10_START)):
        with Locations((0, 7.5875)):
            Rectangle(EDGE_FLANGE10_PROFILE_W, EDGE_FLANGE10_PROFILE_H)
        with Locations((-11, 8)):
            Circle(EDGE_FLANGE10_PROFILE_R, mode=Mode.SUBTRACT)
        with Locations((11, 8)):
            Circle(EDGE_FLANGE10_PROFILE_R, mode=Mode.SUBTRACT)
    edge_flange10_flat = extrude(amount=-EDGE_FLANGE10_FLAT_DEPTH)

    # Mirror3: Edge-Flange10 strip cut, Edge-Flange10 relief cut, Edge-Flange10, Edge-Flange10 flat across plane
    add(edge_flange10_strip_cut.mirror(Plane.ZX), mode=Mode.SUBTRACT)
    add(edge_flange10_relief_cut.mirror(Plane.ZX), mode=Mode.SUBTRACT)
    add(edge_flange10.mirror(Plane.ZX))
    add(edge_flange10_flat.mirror(Plane.ZX))

    # Sketch31 → Cut-Extrude3 (cut, up to next)
    with BuildSketch(Plane(origin=(54.5, 0, 0), x_dir=(0, 0, -1), z_dir=(1, 0, 0)), mode=Mode.PRIVATE) as cut_extrude3_sk1:
        with Locations((-19, 0)):
            Circle(SKETCH31_R)
    cut_extrude3_tool1 = extrude(cut_extrude3_sk1.sketch, amount=-CUT_EXTRUDE3_REACH, mode=Mode.PRIVATE) & part.part
    # Sketch31 → Cut-Extrude3 (cut, up to next)
    with BuildSketch(Plane(origin=(54.5, 0, 0), x_dir=(0, 0, -1), z_dir=(1, 0, 0)), mode=Mode.PRIVATE) as cut_extrude3_sk2:
        with Locations((-4, 15)):
            Circle(SKETCH31_R)
    cut_extrude3_tool2 = extrude(cut_extrude3_sk2.sketch, amount=-CUT_EXTRUDE3_REACH, mode=Mode.PRIVATE) & part.part
    # Sketch31 → Cut-Extrude3 (cut, up to next)
    with BuildSketch(Plane(origin=(54.5, 0, 0), x_dir=(0, 0, -1), z_dir=(1, 0, 0)), mode=Mode.PRIVATE) as cut_extrude3_sk3:
        with Locations((11, 0)):
            Circle(SKETCH31_R)
    cut_extrude3_tool3 = extrude(cut_extrude3_sk3.sketch, amount=-CUT_EXTRUDE3_REACH, mode=Mode.PRIVATE) & part.part
    # Sketch31 → Cut-Extrude3 (cut, up to next)
    with BuildSketch(Plane(origin=(54.5, 0, 0), x_dir=(0, 0, -1), z_dir=(1, 0, 0)), mode=Mode.PRIVATE) as cut_extrude3_sk4:
        with Locations((-4, -15)):
            Circle(SKETCH31_R)
    cut_extrude3_tool4 = extrude(cut_extrude3_sk4.sketch, amount=-CUT_EXTRUDE3_REACH, mode=Mode.PRIVATE) & part.part
    # Sketch31 → Cut-Extrude3 (cut, up to next)
    with BuildSketch(Plane(origin=(54.5, 0, 0), x_dir=(0, 0, -1), z_dir=(1, 0, 0)), mode=Mode.PRIVATE) as cut_extrude3_sk5:
        with Locations((-4, 0)):
            Circle(SKETCH31_R)
    cut_extrude3_tool5 = extrude(cut_extrude3_sk5.sketch, amount=-CUT_EXTRUDE3_REACH, mode=Mode.PRIVATE) & part.part
    add(cut_extrude3_tool1.solids().sort_by_distance((54.5, 0, 19))[0], mode=Mode.SUBTRACT)
    add(cut_extrude3_tool2.solids().sort_by_distance((54.5, 15, 4))[0], mode=Mode.SUBTRACT)
    add(cut_extrude3_tool3.solids().sort_by_distance((54.5, 0, -11))[0], mode=Mode.SUBTRACT)
    add(cut_extrude3_tool4.solids().sort_by_distance((54.5, -15, 4))[0], mode=Mode.SUBTRACT)
    add(cut_extrude3_tool5.solids().sort_by_distance((54.5, 0, 4))[0], mode=Mode.SUBTRACT)

    # Sketch57 → Cut-Extrude4 (cut, up to next)
    with BuildSketch(Plane.ZY.offset(54.5), mode=Mode.PRIVATE) as cut_extrude4_sk1:
        with Locations((4, 0)):
            Circle(SKETCH57_R)
    cut_extrude4_tool1 = extrude(cut_extrude4_sk1.sketch, amount=-CUT_EXTRUDE4_REACH, mode=Mode.PRIVATE) & part.part
    add(cut_extrude4_tool1.solids().sort_by_distance((-54.5, 0, 4))[0], mode=Mode.SUBTRACT)


solid = part.part
